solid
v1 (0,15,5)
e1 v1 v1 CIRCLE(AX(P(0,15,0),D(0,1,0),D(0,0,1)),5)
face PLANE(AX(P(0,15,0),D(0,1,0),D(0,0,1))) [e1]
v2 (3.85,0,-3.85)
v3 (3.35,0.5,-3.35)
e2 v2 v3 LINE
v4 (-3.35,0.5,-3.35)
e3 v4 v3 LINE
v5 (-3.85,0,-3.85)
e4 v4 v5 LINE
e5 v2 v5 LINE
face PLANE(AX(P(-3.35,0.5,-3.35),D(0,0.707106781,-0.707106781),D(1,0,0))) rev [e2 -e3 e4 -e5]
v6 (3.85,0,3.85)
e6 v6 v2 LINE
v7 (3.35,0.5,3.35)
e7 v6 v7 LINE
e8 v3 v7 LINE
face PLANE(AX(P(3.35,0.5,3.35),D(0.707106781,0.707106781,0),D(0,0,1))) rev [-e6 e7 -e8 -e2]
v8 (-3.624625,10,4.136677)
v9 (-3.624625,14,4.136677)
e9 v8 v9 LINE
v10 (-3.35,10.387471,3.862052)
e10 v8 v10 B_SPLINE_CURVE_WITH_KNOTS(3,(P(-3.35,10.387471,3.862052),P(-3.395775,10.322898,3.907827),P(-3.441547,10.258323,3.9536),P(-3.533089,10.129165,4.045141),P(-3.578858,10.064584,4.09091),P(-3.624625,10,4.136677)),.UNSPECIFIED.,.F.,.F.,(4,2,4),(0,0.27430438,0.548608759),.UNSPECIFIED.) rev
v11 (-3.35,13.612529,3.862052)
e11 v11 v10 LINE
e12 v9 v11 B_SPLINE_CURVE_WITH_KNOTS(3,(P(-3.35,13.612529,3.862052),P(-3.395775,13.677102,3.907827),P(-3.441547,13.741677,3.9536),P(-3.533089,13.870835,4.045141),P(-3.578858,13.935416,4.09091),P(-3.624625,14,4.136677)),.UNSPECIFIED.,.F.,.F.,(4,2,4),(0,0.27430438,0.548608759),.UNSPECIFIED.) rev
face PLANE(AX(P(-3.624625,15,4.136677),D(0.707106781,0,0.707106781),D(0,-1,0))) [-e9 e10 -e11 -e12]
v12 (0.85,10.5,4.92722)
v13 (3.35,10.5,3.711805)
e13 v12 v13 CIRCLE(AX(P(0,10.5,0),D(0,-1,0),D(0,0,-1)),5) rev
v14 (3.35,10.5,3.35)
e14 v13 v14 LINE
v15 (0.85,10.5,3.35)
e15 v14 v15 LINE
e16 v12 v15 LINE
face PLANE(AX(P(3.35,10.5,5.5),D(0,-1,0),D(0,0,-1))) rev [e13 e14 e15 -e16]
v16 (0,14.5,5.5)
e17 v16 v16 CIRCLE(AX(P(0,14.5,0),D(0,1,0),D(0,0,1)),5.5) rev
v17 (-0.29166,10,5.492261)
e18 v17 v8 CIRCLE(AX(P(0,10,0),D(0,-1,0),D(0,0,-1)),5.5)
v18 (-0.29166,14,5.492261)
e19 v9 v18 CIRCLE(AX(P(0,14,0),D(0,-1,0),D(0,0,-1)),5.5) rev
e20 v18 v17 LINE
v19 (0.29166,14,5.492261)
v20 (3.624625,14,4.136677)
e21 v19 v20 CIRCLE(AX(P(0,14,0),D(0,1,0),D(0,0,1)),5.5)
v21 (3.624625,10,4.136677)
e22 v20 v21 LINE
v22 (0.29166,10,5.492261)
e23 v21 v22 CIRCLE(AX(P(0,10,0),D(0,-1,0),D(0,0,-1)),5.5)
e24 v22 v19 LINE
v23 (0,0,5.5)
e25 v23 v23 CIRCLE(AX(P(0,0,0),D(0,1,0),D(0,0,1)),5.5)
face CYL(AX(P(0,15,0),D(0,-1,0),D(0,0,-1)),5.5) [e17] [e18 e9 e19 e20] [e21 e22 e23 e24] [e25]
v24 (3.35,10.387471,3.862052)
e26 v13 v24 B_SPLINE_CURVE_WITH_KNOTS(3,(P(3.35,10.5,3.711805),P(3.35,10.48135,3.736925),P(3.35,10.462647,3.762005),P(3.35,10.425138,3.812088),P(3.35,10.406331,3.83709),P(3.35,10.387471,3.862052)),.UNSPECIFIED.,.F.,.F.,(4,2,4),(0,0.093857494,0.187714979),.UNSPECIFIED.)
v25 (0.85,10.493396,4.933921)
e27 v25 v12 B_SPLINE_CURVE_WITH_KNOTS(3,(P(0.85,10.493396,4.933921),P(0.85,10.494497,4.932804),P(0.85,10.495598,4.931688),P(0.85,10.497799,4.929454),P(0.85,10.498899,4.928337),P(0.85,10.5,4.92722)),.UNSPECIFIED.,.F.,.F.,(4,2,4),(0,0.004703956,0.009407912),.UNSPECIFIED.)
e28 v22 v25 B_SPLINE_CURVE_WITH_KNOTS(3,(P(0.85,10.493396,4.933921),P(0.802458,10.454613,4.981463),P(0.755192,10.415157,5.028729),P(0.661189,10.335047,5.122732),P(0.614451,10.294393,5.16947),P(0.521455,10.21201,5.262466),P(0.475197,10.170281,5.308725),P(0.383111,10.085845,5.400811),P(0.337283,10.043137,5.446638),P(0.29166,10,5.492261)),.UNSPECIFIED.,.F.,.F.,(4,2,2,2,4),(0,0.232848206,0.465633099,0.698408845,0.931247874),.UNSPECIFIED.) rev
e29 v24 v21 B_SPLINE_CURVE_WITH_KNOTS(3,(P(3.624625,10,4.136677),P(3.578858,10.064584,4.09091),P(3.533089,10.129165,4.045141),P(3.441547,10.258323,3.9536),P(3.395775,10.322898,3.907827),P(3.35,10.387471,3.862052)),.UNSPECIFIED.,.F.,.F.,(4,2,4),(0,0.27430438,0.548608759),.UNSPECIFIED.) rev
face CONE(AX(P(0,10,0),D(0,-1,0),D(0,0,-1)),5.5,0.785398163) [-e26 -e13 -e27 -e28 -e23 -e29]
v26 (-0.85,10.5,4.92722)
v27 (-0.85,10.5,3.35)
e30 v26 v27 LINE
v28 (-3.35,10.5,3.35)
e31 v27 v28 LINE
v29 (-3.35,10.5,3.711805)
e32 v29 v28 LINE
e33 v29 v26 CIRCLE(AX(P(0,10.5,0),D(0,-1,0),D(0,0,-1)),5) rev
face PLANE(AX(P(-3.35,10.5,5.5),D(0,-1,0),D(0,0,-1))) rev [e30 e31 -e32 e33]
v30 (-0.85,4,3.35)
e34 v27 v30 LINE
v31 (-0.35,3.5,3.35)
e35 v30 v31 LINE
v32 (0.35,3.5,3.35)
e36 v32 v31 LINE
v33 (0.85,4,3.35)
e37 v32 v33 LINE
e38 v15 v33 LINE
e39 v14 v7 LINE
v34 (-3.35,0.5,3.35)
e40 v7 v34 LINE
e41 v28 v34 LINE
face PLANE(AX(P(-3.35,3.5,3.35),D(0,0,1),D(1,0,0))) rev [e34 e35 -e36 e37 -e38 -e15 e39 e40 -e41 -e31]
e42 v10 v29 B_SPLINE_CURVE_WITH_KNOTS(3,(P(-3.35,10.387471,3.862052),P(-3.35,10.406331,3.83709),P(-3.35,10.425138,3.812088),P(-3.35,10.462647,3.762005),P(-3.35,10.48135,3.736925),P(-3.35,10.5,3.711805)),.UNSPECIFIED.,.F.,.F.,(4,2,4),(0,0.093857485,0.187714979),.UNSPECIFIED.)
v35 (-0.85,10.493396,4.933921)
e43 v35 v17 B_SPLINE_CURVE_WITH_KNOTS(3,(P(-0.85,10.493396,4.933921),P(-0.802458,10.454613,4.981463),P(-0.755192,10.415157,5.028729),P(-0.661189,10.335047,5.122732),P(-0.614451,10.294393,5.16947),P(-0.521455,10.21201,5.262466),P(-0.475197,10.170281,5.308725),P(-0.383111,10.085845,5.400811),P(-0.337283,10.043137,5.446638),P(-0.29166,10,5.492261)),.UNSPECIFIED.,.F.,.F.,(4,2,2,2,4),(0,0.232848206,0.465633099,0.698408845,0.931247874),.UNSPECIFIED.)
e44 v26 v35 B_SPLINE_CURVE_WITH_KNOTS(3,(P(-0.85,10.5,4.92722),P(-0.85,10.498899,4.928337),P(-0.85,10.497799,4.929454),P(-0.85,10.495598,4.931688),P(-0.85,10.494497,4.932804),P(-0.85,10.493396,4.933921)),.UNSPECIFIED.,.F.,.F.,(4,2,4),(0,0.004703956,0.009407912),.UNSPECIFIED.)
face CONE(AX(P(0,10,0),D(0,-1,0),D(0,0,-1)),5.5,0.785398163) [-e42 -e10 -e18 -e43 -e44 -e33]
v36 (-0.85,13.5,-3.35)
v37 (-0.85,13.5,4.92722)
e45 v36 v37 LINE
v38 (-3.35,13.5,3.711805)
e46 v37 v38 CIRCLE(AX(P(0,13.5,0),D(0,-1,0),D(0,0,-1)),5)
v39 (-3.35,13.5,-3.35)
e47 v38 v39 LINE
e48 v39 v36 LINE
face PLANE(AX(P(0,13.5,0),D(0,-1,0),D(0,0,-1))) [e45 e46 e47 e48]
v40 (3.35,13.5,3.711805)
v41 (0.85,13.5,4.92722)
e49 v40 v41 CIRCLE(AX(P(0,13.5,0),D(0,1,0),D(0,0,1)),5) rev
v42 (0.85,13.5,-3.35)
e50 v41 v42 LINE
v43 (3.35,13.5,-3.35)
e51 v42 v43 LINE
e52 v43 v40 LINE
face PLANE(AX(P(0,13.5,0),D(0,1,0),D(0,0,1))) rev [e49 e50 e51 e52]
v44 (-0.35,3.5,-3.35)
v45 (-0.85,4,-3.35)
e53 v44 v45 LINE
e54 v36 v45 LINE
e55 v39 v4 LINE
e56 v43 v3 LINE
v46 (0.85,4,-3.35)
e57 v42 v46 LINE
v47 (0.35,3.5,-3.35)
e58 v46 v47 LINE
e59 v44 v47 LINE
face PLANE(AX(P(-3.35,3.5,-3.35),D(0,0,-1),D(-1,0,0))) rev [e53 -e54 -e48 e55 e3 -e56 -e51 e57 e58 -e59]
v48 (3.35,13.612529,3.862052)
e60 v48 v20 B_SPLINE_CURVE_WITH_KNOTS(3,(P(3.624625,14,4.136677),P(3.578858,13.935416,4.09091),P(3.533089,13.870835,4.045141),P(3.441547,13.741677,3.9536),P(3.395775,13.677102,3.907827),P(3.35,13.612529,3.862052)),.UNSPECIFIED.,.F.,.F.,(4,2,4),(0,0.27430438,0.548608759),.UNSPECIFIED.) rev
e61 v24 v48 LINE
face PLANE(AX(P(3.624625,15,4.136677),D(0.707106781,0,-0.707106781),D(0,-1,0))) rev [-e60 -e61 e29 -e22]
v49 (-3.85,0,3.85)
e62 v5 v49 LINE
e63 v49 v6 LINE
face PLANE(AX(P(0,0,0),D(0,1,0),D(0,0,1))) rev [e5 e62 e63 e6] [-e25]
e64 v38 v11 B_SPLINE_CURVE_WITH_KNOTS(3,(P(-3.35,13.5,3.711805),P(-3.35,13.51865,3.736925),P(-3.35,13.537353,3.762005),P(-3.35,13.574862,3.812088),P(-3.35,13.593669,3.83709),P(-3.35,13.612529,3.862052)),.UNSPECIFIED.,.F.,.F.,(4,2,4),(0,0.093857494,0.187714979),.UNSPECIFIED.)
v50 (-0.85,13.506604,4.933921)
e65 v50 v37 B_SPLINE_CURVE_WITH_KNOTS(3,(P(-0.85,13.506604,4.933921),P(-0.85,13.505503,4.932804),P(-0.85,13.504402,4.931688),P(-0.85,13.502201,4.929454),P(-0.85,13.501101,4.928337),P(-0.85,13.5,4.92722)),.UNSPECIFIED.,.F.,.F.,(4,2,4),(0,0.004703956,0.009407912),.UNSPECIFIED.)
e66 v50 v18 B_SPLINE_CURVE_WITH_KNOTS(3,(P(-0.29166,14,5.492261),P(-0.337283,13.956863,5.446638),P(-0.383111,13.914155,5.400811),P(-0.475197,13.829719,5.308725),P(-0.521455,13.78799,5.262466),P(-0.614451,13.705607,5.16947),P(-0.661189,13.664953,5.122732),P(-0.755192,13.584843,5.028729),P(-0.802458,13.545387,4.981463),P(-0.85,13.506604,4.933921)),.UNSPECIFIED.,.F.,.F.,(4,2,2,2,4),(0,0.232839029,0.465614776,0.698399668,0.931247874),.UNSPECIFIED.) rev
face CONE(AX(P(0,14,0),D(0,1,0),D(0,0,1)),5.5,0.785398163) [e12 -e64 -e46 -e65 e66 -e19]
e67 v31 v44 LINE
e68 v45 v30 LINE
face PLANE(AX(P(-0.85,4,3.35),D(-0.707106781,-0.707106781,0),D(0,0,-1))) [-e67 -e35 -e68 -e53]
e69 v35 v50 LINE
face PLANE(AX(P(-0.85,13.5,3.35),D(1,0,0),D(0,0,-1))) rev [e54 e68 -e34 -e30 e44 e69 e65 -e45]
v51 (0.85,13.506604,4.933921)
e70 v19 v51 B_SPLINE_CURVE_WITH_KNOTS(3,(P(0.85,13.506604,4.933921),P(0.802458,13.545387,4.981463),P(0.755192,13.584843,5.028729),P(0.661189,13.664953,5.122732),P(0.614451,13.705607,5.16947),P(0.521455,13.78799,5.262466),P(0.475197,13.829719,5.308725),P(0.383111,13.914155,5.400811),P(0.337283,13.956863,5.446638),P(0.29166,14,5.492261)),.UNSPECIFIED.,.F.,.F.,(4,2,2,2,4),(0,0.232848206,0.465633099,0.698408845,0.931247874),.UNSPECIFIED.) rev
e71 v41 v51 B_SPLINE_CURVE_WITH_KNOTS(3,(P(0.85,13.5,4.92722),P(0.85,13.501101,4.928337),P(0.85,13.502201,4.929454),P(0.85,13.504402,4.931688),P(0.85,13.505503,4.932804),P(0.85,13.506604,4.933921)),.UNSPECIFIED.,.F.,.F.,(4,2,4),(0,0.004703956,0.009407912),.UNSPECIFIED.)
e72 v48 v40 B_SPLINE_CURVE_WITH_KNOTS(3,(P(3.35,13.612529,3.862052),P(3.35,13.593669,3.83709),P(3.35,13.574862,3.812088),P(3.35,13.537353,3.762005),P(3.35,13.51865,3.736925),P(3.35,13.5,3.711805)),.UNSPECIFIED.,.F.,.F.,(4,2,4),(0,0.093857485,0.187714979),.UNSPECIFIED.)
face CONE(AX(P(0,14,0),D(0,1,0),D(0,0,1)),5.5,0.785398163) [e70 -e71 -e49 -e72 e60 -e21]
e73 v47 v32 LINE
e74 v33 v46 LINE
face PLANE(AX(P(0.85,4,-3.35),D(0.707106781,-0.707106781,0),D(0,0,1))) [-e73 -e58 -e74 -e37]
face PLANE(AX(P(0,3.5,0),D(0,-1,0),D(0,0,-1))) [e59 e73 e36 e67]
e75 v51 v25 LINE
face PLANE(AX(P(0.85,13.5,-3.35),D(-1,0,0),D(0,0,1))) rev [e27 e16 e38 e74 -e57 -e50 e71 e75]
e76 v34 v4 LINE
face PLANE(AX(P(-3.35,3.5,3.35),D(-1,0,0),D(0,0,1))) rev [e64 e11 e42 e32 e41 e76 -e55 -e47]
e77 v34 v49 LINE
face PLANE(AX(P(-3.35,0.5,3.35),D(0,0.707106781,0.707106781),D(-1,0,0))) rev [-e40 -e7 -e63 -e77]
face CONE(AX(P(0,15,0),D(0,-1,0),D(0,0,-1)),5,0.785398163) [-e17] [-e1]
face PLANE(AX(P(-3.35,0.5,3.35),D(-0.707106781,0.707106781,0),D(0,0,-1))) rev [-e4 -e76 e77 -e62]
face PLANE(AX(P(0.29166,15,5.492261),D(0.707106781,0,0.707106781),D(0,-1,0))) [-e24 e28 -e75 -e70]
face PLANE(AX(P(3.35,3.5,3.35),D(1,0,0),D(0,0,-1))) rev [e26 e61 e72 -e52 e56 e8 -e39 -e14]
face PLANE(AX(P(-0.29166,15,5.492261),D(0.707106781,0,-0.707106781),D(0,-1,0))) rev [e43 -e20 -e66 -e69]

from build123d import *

# Parameters (mm, degrees)
SKETCH1_R           = 5.5
BOSS_EXTRUDE1_DEPTH = 15
SKETCH2_W           = 6.7
SKETCH2_H           = 6.7
CUT_EXTRUDE1_DEPTH  = 3.5
SKETCH3_W           = 2.5
SKETCH3_H           = 6.7
CUT_EXTRUDE2_DEPTH  = 10
SKETCH4_W           = 2.5
SKETCH4_H           = 3
CUT_EXTRUDE3_DEPTH  = 19.263967258
CHAMFER1_SIZE       = 0.5
CHAMFER2_SIZE       = 0.5


with BuildPart() as part:
    # Sketch1 → Boss-Extrude1 (new body)
    with BuildSketch(Plane(origin=(0, 0, 0), x_dir=(1, 0, 0), z_dir=(0, 1, 0))):
        with Locations(Location((0, 0, 0), (0, 0, 270))):
            Circle(SKETCH1_R)
    extrude(amount=BOSS_EXTRUDE1_DEPTH)

    # Sketch2 → Cut-Extrude1 (cut)
    with BuildSketch(Plane.XZ):
        Rectangle(SKETCH2_W, SKETCH2_H)
    extrude(amount=-CUT_EXTRUDE1_DEPTH, mode=Mode.SUBTRACT)

    # Sketch3 → Cut-Extrude2 (cut)
    with BuildSketch(Plane.XZ.offset(-3.5)):
        with Locations((-2.1, 0)):
            Rectangle(SKETCH3_W, SKETCH3_H)
        with Locations((2.1, 0)):
            Rectangle(SKETCH3_W, SKETCH3_H)
    extrude(amount=-CUT_EXTRUDE2_DEPTH, mode=Mode.SUBTRACT)

    # Sketch4 → Cut-Extrude3 (cut, through all)
    with BuildSketch(Plane(origin=(0, 0, 3.35), x_dir=(-1, 0, 0), z_dir=(0, 0, -1))):
        with Locations((2.1, 12)):
            Rectangle(SKETCH4_W, SKETCH4_H)
        with Locations((-2.1, 12)):
            Rectangle(SKETCH4_W, SKETCH4_H)
    extrude(amount=-CUT_EXTRUDE3_DEPTH, mode=Mode.SUBTRACT)

    # Chamfer1
    # the kernel refuses this chamfer: 0.599923048, 0.5, 0.35658472 mm, written as the material it takes off along each edge
    with BuildSketch(Plane(origin=(3.35, 0, -3.35), x_dir=(0, 1, 0), z_dir=(-1, 0, 0)), Plane(origin=(0.85, 3.5, 3.35), x_dir=(-1, 0, 0), z_dir=(0, 0, -1)), Plane(origin=(3.35, 0, 3.35), x_dir=(0, 1, 0), z_dir=(0, 0, -1)), Plane(origin=(-3.35, 0, 3.35), x_dir=(0, 1, 0), z_dir=(1, 0, 0)), Plane(origin=(-3.35, 0, -3.35), x_dir=(0, 1, 0), z_dir=(0, 0, 1))) as chamfer1_piece_1:
        Polygon((CHAMFER1_SIZE, 0), (0, CHAMFER1_SIZE), (0, 0), align=None)
    extrude(amount=6.7, mode=Mode.SUBTRACT)
    with BuildSketch(Plane(origin=(-0.85, 3.5, 3.35), x_dir=(1, 0, 0), z_dir=(0, 0, -1))) as chamfer1_piece_2:
        Polygon((CHAMFER1_SIZE, 0), (0, -CHAMFER1_SIZE), (0, 0), align=None)
    extrude(amount=6.7, mode=Mode.SUBTRACT)
    with BuildSketch(Plane(origin=(-3.35, 13.5, 4.362052269), x_dir=(-0.7730150093099369, 0, -0.6343877326852705), z_dir=(0, -1, 0))) as chamfer1_piece_3:
        with BuildLine():
            Line((0.355264336, 0), (CHAMFER1_SIZE * 0.634387732685, CHAMFER1_SIZE * 0.77301500931))
            Line((CHAMFER1_SIZE * 0.634387732685, CHAMFER1_SIZE * 0.77301500931), (0, 0))
            ThreePointArc((0, 0), (0.17861115, -0.002869133), (0.355264336, 0))
        make_face()
    extrude(amount=3, mode=Mode.SUBTRACT)
    with BuildSketch(Plane(origin=(-0.85, 13.5, 5.433921236), x_dir=(0.9945853784930031, 0, 0.10392268707038738), z_dir=(0, -1, 0))) as chamfer1_piece_4:
        with BuildLine():
            Line((0.561379751, 0), (-CHAMFER1_SIZE * 0.10392268707, -CHAMFER1_SIZE * 0.994585378493))
            Line((-CHAMFER1_SIZE * 0.10392268707, -CHAMFER1_SIZE * 0.994585378493), (0, 0))
            ThreePointArc((0, 0), (0.290009157, 0.007159211), (0.561379751, 0))
        make_face()
    extrude(amount=3, mode=Mode.SUBTRACT)
    with BuildSketch(Plane(origin=(0.85, 13.5, 5.433921236), x_dir=(-0.9945853784930031, 0, 0.10392268707038782), z_dir=(0, -1, 0))) as chamfer1_piece_5:
        with BuildLine():
            Line((0.561379751, 0), (-CHAMFER1_SIZE * 0.10392268707, CHAMFER1_SIZE * 0.994585378493))
            Line((-CHAMFER1_SIZE * 0.10392268707, CHAMFER1_SIZE * 0.994585378493), (0, 0))
            ThreePointArc((0, 0), (0.290009157, -0.007159211), (0.561379751, 0))
        make_face()
    extrude(amount=3, mode=Mode.SUBTRACT)
    with BuildSketch(Plane(origin=(3.35, 13.5, 4.362052269), x_dir=(0.7730150093099386, 0, -0.6343877326852684), z_dir=(0, -1, 0))) as chamfer1_piece_6:
        with BuildLine():
            Line((0.355264336, 0), (CHAMFER1_SIZE * 0.634387732685, -CHAMFER1_SIZE * 0.77301500931))
            Line((CHAMFER1_SIZE * 0.634387732685, -CHAMFER1_SIZE * 0.77301500931), (0, 0))
            ThreePointArc((0, 0), (0.17861115, 0.002869133), (0.355264336, 0))
        make_face()
    extrude(amount=3, mode=Mode.SUBTRACT)
    with BuildSketch(Plane(origin=(4.635841494, 0, -3.35), x_dir=(0, 1, 0), z_dir=(-1, 0, 0))) as chamfer1_piece_7a_section:
        Polygon((CHAMFER1_SIZE, 0), (0, CHAMFER1_SIZE), (0, 0), align=None)
    chamfer1_piece_7a = extrude(amount=7.985841494, mode=Mode.PRIVATE)
    chamfer1_piece_7a = chamfer1_piece_7a & Plane(origin=(0, 0, 0), x_dir=(0, 0, 1), z_dir=(0, -1, 0)) * Cylinder(5.5, 18, mode=Mode.PRIVATE)
    chamfer1_piece_7a = split(chamfer1_piece_7a, bisect_by=Plane(origin=(3.35, 0, -3.35), z_dir=(1, 0, 0)), keep=Keep.TOP, mode=Mode.PRIVATE)
    with BuildSketch(Plane(origin=(3.35, 0, 3.35), x_dir=(0, 1, 0), z_dir=(0, 0, -1))) as chamfer1_piece_7b_section:
        Polygon((CHAMFER1_SIZE, 0), (0, CHAMFER1_SIZE), (0, 0), align=None)
    chamfer1_piece_7b = extrude(amount=7.985841494, mode=Mode.PRIVATE)
    chamfer1_piece_7b = chamfer1_piece_7b & Plane(origin=(0, 0, 0), x_dir=(0, 0, 1), z_dir=(0, -1, 0)) * Cylinder(5.5, 18, mode=Mode.PRIVATE)
    chamfer1_piece_7b = split(chamfer1_piece_7b, bisect_by=Plane(origin=(3.35, 0, -3.35), z_dir=(0, 0, -1)), keep=Keep.TOP, mode=Mode.PRIVATE)
    chamfer1_piece_7 = chamfer1_piece_7a & chamfer1_piece_7b
    add(chamfer1_piece_7, mode=Mode.SUBTRACT)
    with BuildSketch(Plane(origin=(3.35, 0, -3.35), x_dir=(0, 1, 0), z_dir=(-1, 0, 0))) as chamfer1_piece_8a_section:
        Polygon((CHAMFER1_SIZE, 0), (0, CHAMFER1_SIZE), (0, 0), align=None)
    chamfer1_piece_8a = extrude(amount=7.985841494, mode=Mode.PRIVATE)
    chamfer1_piece_8a = chamfer1_piece_8a & Plane(origin=(0, 0, 0), x_dir=(0, 0, 1), z_dir=(0, -1, 0)) * Cylinder(5.5, 18, mode=Mode.PRIVATE)
    chamfer1_piece_8a = split(chamfer1_piece_8a, bisect_by=Plane(origin=(-3.35, 0, -3.35), z_dir=(-1, 0, 0)), keep=Keep.TOP, mode=Mode.PRIVATE)
    with BuildSketch(Plane(origin=(-3.35, 0, -4.635841494), x_dir=(0, 1, 0), z_dir=(0, 0, 1))) as chamfer1_piece_8b_section:
        Polygon((CHAMFER1_SIZE, 0), (0, CHAMFER1_SIZE), (0, 0), align=None)
    chamfer1_piece_8b = extrude(amount=7.985841494, mode=Mode.PRIVATE)
    chamfer1_piece_8b = chamfer1_piece_8b & Plane(origin=(0, 0, 0), x_dir=(0, 0, 1), z_dir=(0, -1, 0)) * Cylinder(5.5, 18, mode=Mode.PRIVATE)
    chamfer1_piece_8b = split(chamfer1_piece_8b, bisect_by=Plane(origin=(-3.35, 0, -3.35), z_dir=(0, 0, -1)), keep=Keep.TOP, mode=Mode.PRIVATE)
    chamfer1_piece_8 = chamfer1_piece_8a & chamfer1_piece_8b
    add(chamfer1_piece_8, mode=Mode.SUBTRACT)
    with BuildSketch(Plane(origin=(-3.35, 0, 3.35), x_dir=(0, 1, 0), z_dir=(1, 0, 0))) as chamfer1_piece_9a_section:
        Polygon((CHAMFER1_SIZE, 0), (0, CHAMFER1_SIZE), (0, 0), align=None)
    chamfer1_piece_9a = extrude(amount=7.985841494, mode=Mode.PRIVATE)
    chamfer1_piece_9a = chamfer1_piece_9a & Plane(origin=(0, 0, 0), x_dir=(0, 0, 1), z_dir=(0, -1, 0)) * Cylinder(5.5, 18, mode=Mode.PRIVATE)
    chamfer1_piece_9a = split(chamfer1_piece_9a, bisect_by=Plane(origin=(3.35, 0, 3.35), z_dir=(1, 0, 0)), keep=Keep.TOP, mode=Mode.PRIVATE)
    with BuildSketch(Plane(origin=(3.35, 0, 4.635841494), x_dir=(0, 1, 0), z_dir=(0, 0, -1))) as chamfer1_piece_9b_section:
        Polygon((CHAMFER1_SIZE, 0), (0, CHAMFER1_SIZE), (0, 0), align=None)
    chamfer1_piece_9b = extrude(amount=7.985841494, mode=Mode.PRIVATE)
    chamfer1_piece_9b = chamfer1_piece_9b & Plane(origin=(0, 0, 0), x_dir=(0, 0, 1), z_dir=(0, -1, 0)) * Cylinder(5.5, 18, mode=Mode.PRIVATE)
    chamfer1_piece_9b = split(chamfer1_piece_9b, bisect_by=Plane(origin=(3.35, 0, 3.35), z_dir=(0, 0, 1)), keep=Keep.TOP, mode=Mode.PRIVATE)
    chamfer1_piece_9 = chamfer1_piece_9a & chamfer1_piece_9b
    add(chamfer1_piece_9, mode=Mode.SUBTRACT)
    with BuildSketch(Plane(origin=(-4.635841494, 0, 3.35), x_dir=(0, 1, 0), z_dir=(1, 0, 0))) as chamfer1_piece_10a_section:
        Polygon((CHAMFER1_SIZE, 0), (0, CHAMFER1_SIZE), (0, 0), align=None)
    chamfer1_piece_10a = extrude(amount=7.985841494, mode=Mode.PRIVATE)
    chamfer1_piece_10a = chamfer1_piece_10a & Plane(origin=(0, 0, 0), x_dir=(0, 0, 1), z_dir=(0, -1, 0)) * Cylinder(5.5, 18, mode=Mode.PRIVATE)
    chamfer1_piece_10a = split(chamfer1_piece_10a, bisect_by=Plane(origin=(-3.35, 0, 3.35), z_dir=(-1, 0, 0)), keep=Keep.TOP, mode=Mode.PRIVATE)
    with BuildSketch(Plane(origin=(-3.35, 0, -3.35), x_dir=(0, 1, 0), z_dir=(0, 0, 1))) as chamfer1_piece_10b_section:
        Polygon((CHAMFER1_SIZE, 0), (0, CHAMFER1_SIZE), (0, 0), align=None)
    chamfer1_piece_10b = extrude(amount=7.985841494, mode=Mode.PRIVATE)
    chamfer1_piece_10b = chamfer1_piece_10b & Plane(origin=(0, 0, 0), x_dir=(0, 0, 1), z_dir=(0, -1, 0)) * Cylinder(5.5, 18, mode=Mode.PRIVATE)
    chamfer1_piece_10b = split(chamfer1_piece_10b, bisect_by=Plane(origin=(-3.35, 0, 3.35), z_dir=(0, 0, 1)), keep=Keep.TOP, mode=Mode.PRIVATE)
    chamfer1_piece_10 = chamfer1_piece_10a & chamfer1_piece_10b
    add(chamfer1_piece_10, mode=Mode.SUBTRACT)
    # the kernel refuses this chamfer: 0.599923048, 0.5, 0.35658472 mm, written as the material it takes off along each edge
    with BuildSketch(Plane(origin=(0, 10.5, 0), x_dir=(0.17976967386788098, 0, 0.9837087294303308), z_dir=(0.9837087294303308, 0, -0.17976967386788098))) as chamfer1_2_piece_1_section:
        Polygon((5.5, CHAMFER1_SIZE), (5.5 - CHAMFER1_SIZE, 0), (5.5, 0), align=None)
    chamfer1_2_piece_1 = revolve(axis=Axis((0, 10.5, 0), (0, -1, 0)), revolution_arc=64.977834745, mode=Mode.PRIVATE)
    chamfer1_2_piece_1 = split(chamfer1_2_piece_1, bisect_by=Plane(origin=(2.891960618, 10.5, 2.891960618), z_dir=(0.707106781186547, 0, 0.7071067811865481)), keep=Keep.TOP, mode=Mode.PRIVATE)
    add(chamfer1_2_piece_1, mode=Mode.SUBTRACT)
    with BuildSketch(Plane(origin=(0, 10.5, 0), x_dir=(0.17976967386788098, 0, 0.9837087294303308), z_dir=(0.9837087294303308, 0, -0.17976967386788098))) as chamfer1_2_piece_2_section:
        Polygon((5.5, CHAMFER1_SIZE), (5.5 - CHAMFER1_SIZE, 0), (5.5, 0), align=None)
    chamfer1_2_piece_2 = revolve(axis=Axis((0, 10.5, 0), (0, -1, 0)), revolution_arc=64.977834745, mode=Mode.PRIVATE)
    chamfer1_2_piece_2 = split(chamfer1_2_piece_2, bisect_by=Plane(origin=(0.85, 10.5, 0), z_dir=(1, 0, 0)), keep=Keep.TOP, mode=Mode.PRIVATE)
    add(chamfer1_2_piece_2, mode=Mode.SUBTRACT)
    with BuildSketch(Plane(origin=(0, 10.5, 0), x_dir=(0.17976967386788098, 0, 0.9837087294303308), z_dir=(0.9837087294303308, 0, -0.17976967386788098))) as chamfer1_2_piece_3_section:
        Polygon((5.5, CHAMFER1_SIZE), (5.5 - CHAMFER1_SIZE, 0), (5.5, 0), align=None)
    chamfer1_2_piece_3 = revolve(axis=Axis((0, 10.5, 0), (0, -1, 0)), revolution_arc=64.977834745, mode=Mode.PRIVATE)
    chamfer1_2_piece_3 = split(chamfer1_2_piece_3, bisect_by=Plane(origin=(-0.85, 10.5, 0), z_dir=(-1, 0, 0)), keep=Keep.TOP, mode=Mode.PRIVATE)
    chamfer1_2_piece_3 = split(chamfer1_2_piece_3, bisect_by=Plane(origin=(0.256026135, 10.5, 0.256026135), z_dir=(0.7071067811865424, 0, 0.7071067811865527)), keep=Keep.TOP, mode=Mode.PRIVATE)
    add(chamfer1_2_piece_3, mode=Mode.SUBTRACT)
    with BuildSketch(Plane(origin=(0, 10.5, 0), x_dir=(0.17976967386788098, 0, 0.9837087294303308), z_dir=(0.9837087294303308, 0, -0.17976967386788098))) as chamfer1_2_piece_4_section:
        Polygon((5.5, CHAMFER1_SIZE), (5.5 - CHAMFER1_SIZE, 0), (5.5, 0), align=None)
    chamfer1_2_piece_4 = revolve(axis=Axis((0, 10.5, 0), (0, -1, 0)), revolution_arc=64.977834745, mode=Mode.PRIVATE)
    chamfer1_2_piece_4 = split(chamfer1_2_piece_4, bisect_by=Plane(origin=(-3.35, 10.5, 0), z_dir=(1, 0, 0)), keep=Keep.TOP, mode=Mode.PRIVATE)
    chamfer1_2_piece_4 = split(chamfer1_2_piece_4, bisect_by=Plane(origin=(-2.891960618, 10.5, 2.891960618), z_dir=(-0.7071067811865455, 0, 0.7071067811865496)), keep=Keep.TOP, mode=Mode.PRIVATE)
    add(chamfer1_2_piece_4, mode=Mode.SUBTRACT)
    with BuildSketch(Plane(origin=(0, 13.5, 0), x_dir=(-0.8153450150908111, 0, 0.57897539357607), z_dir=(-0.57897539357607, 0, -0.8153450150908111))) as chamfer1_2_piece_5_section:
        Polygon((5.5, CHAMFER1_SIZE), (5.5 - CHAMFER1_SIZE, 0), (5.5, 0), align=None)
    chamfer1_2_piece_5 = revolve(axis=Axis((0, 13.5, 0), (0, 1, 0)), revolution_arc=64.977834745, mode=Mode.PRIVATE)
    chamfer1_2_piece_5 = split(chamfer1_2_piece_5, bisect_by=Plane(origin=(-3.35, 13.5, 0), z_dir=(1, 0, 0)), keep=Keep.TOP, mode=Mode.PRIVATE)
    chamfer1_2_piece_5 = split(chamfer1_2_piece_5, bisect_by=Plane(origin=(-2.891960618, 13.5, 2.891960618), z_dir=(-0.7071067811865455, 0, 0.7071067811865496)), keep=Keep.TOP, mode=Mode.PRIVATE)
    add(chamfer1_2_piece_5, mode=Mode.SUBTRACT)
    with BuildSketch(Plane(origin=(0, 13.5, 0), x_dir=(-0.8153450150908111, 0, 0.57897539357607), z_dir=(-0.57897539357607, 0, -0.8153450150908111))) as chamfer1_2_piece_6_section:
        Polygon((5.5, CHAMFER1_SIZE), (5.5 - CHAMFER1_SIZE, 0), (5.5, 0), align=None)
    chamfer1_2_piece_6 = revolve(axis=Axis((0, 13.5, 0), (0, 1, 0)), revolution_arc=64.977834745, mode=Mode.PRIVATE)
    chamfer1_2_piece_6 = split(chamfer1_2_piece_6, bisect_by=Plane(origin=(-0.85, 13.5, 0), z_dir=(-1, 0, 0)), keep=Keep.TOP, mode=Mode.PRIVATE)
    chamfer1_2_piece_6 = split(chamfer1_2_piece_6, bisect_by=Plane(origin=(0.256026135, 13.5, 0.256026135), z_dir=(0.7071067811865424, 0, 0.7071067811865527)), keep=Keep.TOP, mode=Mode.PRIVATE)
    add(chamfer1_2_piece_6, mode=Mode.SUBTRACT)
    with BuildSketch(Plane(origin=(0, 13.5, 0), x_dir=(-0.8153450150908111, 0, 0.57897539357607), z_dir=(-0.57897539357607, 0, -0.8153450150908111))) as chamfer1_2_piece_7_section:
        Polygon((5.5, CHAMFER1_SIZE), (5.5 - CHAMFER1_SIZE, 0), (5.5, 0), align=None)
    chamfer1_2_piece_7 = revolve(axis=Axis((0, 13.5, 0), (0, 1, 0)), revolution_arc=64.977834745, mode=Mode.PRIVATE)
    chamfer1_2_piece_7 = split(chamfer1_2_piece_7, bisect_by=Plane(origin=(0.85, 13.5, 0), z_dir=(1, 0, 0)), keep=Keep.TOP, mode=Mode.PRIVATE)
    add(chamfer1_2_piece_7, mode=Mode.SUBTRACT)
    with BuildSketch(Plane(origin=(0, 13.5, 0), x_dir=(-0.8153450150908111, 0, 0.57897539357607), z_dir=(-0.57897539357607, 0, -0.8153450150908111))) as chamfer1_2_piece_8_section:
        Polygon((5.5, CHAMFER1_SIZE), (5.5 - CHAMFER1_SIZE, 0), (5.5, 0), align=None)
    chamfer1_2_piece_8 = revolve(axis=Axis((0, 13.5, 0), (0, 1, 0)), revolution_arc=64.977834745, mode=Mode.PRIVATE)
    chamfer1_2_piece_8 = split(chamfer1_2_piece_8, bisect_by=Plane(origin=(2.891960618, 13.5, 2.891960618), z_dir=(0.707106781186547, 0, 0.7071067811865481)), keep=Keep.TOP, mode=Mode.PRIVATE)
    add(chamfer1_2_piece_8, mode=Mode.SUBTRACT)
    with BuildSketch(Plane(origin=(0, 13.5, 0), x_dir=(-0.17976967386788484, 0, 0.98370872943033), z_dir=(-0.98370872943033, 0, -0.17976967386788484))) as chamfer1_2_piece_9_section:
        Polygon((5.5, CHAMFER1_SIZE), (5.5 - CHAMFER1_SIZE, 0), (5.5, 0), align=None)
    chamfer1_2_piece_9 = revolve(axis=Axis((0, 13.5, 0), (0, 1, 0)), revolution_arc=64.977834745, mode=Mode.PRIVATE)
    chamfer1_2_piece_9 = split(chamfer1_2_piece_9, bisect_by=Plane(origin=(-2.891960618, 13.5, 2.891960618), z_dir=(-0.7071067811865455, 0, 0.7071067811865496)), keep=Keep.TOP, mode=Mode.PRIVATE)
    add(chamfer1_2_piece_9, mode=Mode.SUBTRACT)
    with BuildSketch(Plane(origin=(0, 13.5, 0), x_dir=(-0.17976967386788484, 0, 0.98370872943033), z_dir=(-0.98370872943033, 0, -0.17976967386788484))) as chamfer1_2_piece_10_section:
        Polygon((5.5, CHAMFER1_SIZE), (5.5 - CHAMFER1_SIZE, 0), (5.5, 0), align=None)
    chamfer1_2_piece_10 = revolve(axis=Axis((0, 13.5, 0), (0, 1, 0)), revolution_arc=64.977834745, mode=Mode.PRIVATE)
    chamfer1_2_piece_10 = split(chamfer1_2_piece_10, bisect_by=Plane(origin=(-0.85, 13.5, 0), z_dir=(-1, 0, 0)), keep=Keep.TOP, mode=Mode.PRIVATE)
    add(chamfer1_2_piece_10, mode=Mode.SUBTRACT)
    with BuildSketch(Plane(origin=(0, 13.5, 0), x_dir=(-0.17976967386788484, 0, 0.98370872943033), z_dir=(-0.98370872943033, 0, -0.17976967386788484))) as chamfer1_2_piece_11_section:
        Polygon((5.5, CHAMFER1_SIZE), (5.5 - CHAMFER1_SIZE, 0), (5.5, 0), align=None)
    chamfer1_2_piece_11 = revolve(axis=Axis((0, 13.5, 0), (0, 1, 0)), revolution_arc=64.977834745, mode=Mode.PRIVATE)
    chamfer1_2_piece_11 = split(chamfer1_2_piece_11, bisect_by=Plane(origin=(0.85, 13.5, 0), z_dir=(1, 0, 0)), keep=Keep.TOP, mode=Mode.PRIVATE)
    chamfer1_2_piece_11 = split(chamfer1_2_piece_11, bisect_by=Plane(origin=(-0.256026135, 13.5, 0.256026135), z_dir=(-0.7071067811865516, 0, 0.7071067811865436)), keep=Keep.TOP, mode=Mode.PRIVATE)
    add(chamfer1_2_piece_11, mode=Mode.SUBTRACT)
    with BuildSketch(Plane(origin=(0, 13.5, 0), x_dir=(-0.17976967386788484, 0, 0.98370872943033), z_dir=(-0.98370872943033, 0, -0.17976967386788484))) as chamfer1_2_piece_12_section:
        Polygon((5.5, CHAMFER1_SIZE), (5.5 - CHAMFER1_SIZE, 0), (5.5, 0), align=None)
    chamfer1_2_piece_12 = revolve(axis=Axis((0, 13.5, 0), (0, 1, 0)), revolution_arc=64.977834745, mode=Mode.PRIVATE)
    chamfer1_2_piece_12 = split(chamfer1_2_piece_12, bisect_by=Plane(origin=(3.35, 13.5, 0), z_dir=(-1, 0, 0)), keep=Keep.TOP, mode=Mode.PRIVATE)
    chamfer1_2_piece_12 = split(chamfer1_2_piece_12, bisect_by=Plane(origin=(2.891960618, 13.5, 2.891960618), z_dir=(0.707106781186547, 0, 0.7071067811865481)), keep=Keep.TOP, mode=Mode.PRIVATE)
    add(chamfer1_2_piece_12, mode=Mode.SUBTRACT)
    with BuildSketch(Plane(origin=(0, 10.5, 0), x_dir=(0.8153450150908462, 0, 0.5789753935760206), z_dir=(0.5789753935760206, 0, -0.8153450150908462))) as chamfer1_2_piece_13_section:
        Polygon((5.5, CHAMFER1_SIZE), (5.5 - CHAMFER1_SIZE, 0), (5.5, 0), align=None)
    chamfer1_2_piece_13 = revolve(axis=Axis((0, 10.5, 0), (0, -1, 0)), revolution_arc=64.977834745, mode=Mode.PRIVATE)
    chamfer1_2_piece_13 = split(chamfer1_2_piece_13, bisect_by=Plane(origin=(3.35, 10.5, 0), z_dir=(-1, 0, 0)), keep=Keep.TOP, mode=Mode.PRIVATE)
    chamfer1_2_piece_13 = split(chamfer1_2_piece_13, bisect_by=Plane(origin=(2.891960618, 10.5, 2.891960618), z_dir=(0.707106781186547, 0, 0.7071067811865481)), keep=Keep.TOP, mode=Mode.PRIVATE)
    add(chamfer1_2_piece_13, mode=Mode.SUBTRACT)
    with BuildSketch(Plane(origin=(0, 10.5, 0), x_dir=(0.8153450150908462, 0, 0.5789753935760206), z_dir=(0.5789753935760206, 0, -0.8153450150908462))) as chamfer1_2_piece_14_section:
        Polygon((5.5, CHAMFER1_SIZE), (5.5 - CHAMFER1_SIZE, 0), (5.5, 0), align=None)
    chamfer1_2_piece_14 = revolve(axis=Axis((0, 10.5, 0), (0, -1, 0)), revolution_arc=64.977834745, mode=Mode.PRIVATE)
    chamfer1_2_piece_14 = split(chamfer1_2_piece_14, bisect_by=Plane(origin=(0.85, 10.5, 0), z_dir=(1, 0, 0)), keep=Keep.TOP, mode=Mode.PRIVATE)
    chamfer1_2_piece_14 = split(chamfer1_2_piece_14, bisect_by=Plane(origin=(-0.256026135, 10.5, 0.256026135), z_dir=(-0.7071067811865516, 0, 0.7071067811865436)), keep=Keep.TOP, mode=Mode.PRIVATE)
    add(chamfer1_2_piece_14, mode=Mode.SUBTRACT)
    with BuildSketch(Plane(origin=(0, 10.5, 0), x_dir=(0.8153450150908462, 0, 0.5789753935760206), z_dir=(0.5789753935760206, 0, -0.8153450150908462))) as chamfer1_2_piece_15_section:
        Polygon((5.5, CHAMFER1_SIZE), (5.5 - CHAMFER1_SIZE, 0), (5.5, 0), align=None)
    chamfer1_2_piece_15 = revolve(axis=Axis((0, 10.5, 0), (0, -1, 0)), revolution_arc=64.977834745, mode=Mode.PRIVATE)
    chamfer1_2_piece_15 = split(chamfer1_2_piece_15, bisect_by=Plane(origin=(-0.85, 10.5, 0), z_dir=(-1, 0, 0)), keep=Keep.TOP, mode=Mode.PRIVATE)
    add(chamfer1_2_piece_15, mode=Mode.SUBTRACT)
    with BuildSketch(Plane(origin=(0, 10.5, 0), x_dir=(0.8153450150908462, 0, 0.5789753935760206), z_dir=(0.5789753935760206, 0, -0.8153450150908462))) as chamfer1_2_piece_16_section:
        Polygon((5.5, CHAMFER1_SIZE), (5.5 - CHAMFER1_SIZE, 0), (5.5, 0), align=None)
    chamfer1_2_piece_16 = revolve(axis=Axis((0, 10.5, 0), (0, -1, 0)), revolution_arc=64.977834745, mode=Mode.PRIVATE)
    chamfer1_2_piece_16 = split(chamfer1_2_piece_16, bisect_by=Plane(origin=(-2.891960618, 10.5, 2.891960618), z_dir=(-0.7071067811865455, 0, 0.7071067811865496)), keep=Keep.TOP, mode=Mode.PRIVATE)
    add(chamfer1_2_piece_16, mode=Mode.SUBTRACT)

    # Chamfer2
    chamfer2_edges = [part.edges().sort_by_distance(p)[0] for p in [
        (0, 15, -5.5),
    ]]
    chamfer(chamfer2_edges, length=CHAMFER2_SIZE)


solid = part.part
